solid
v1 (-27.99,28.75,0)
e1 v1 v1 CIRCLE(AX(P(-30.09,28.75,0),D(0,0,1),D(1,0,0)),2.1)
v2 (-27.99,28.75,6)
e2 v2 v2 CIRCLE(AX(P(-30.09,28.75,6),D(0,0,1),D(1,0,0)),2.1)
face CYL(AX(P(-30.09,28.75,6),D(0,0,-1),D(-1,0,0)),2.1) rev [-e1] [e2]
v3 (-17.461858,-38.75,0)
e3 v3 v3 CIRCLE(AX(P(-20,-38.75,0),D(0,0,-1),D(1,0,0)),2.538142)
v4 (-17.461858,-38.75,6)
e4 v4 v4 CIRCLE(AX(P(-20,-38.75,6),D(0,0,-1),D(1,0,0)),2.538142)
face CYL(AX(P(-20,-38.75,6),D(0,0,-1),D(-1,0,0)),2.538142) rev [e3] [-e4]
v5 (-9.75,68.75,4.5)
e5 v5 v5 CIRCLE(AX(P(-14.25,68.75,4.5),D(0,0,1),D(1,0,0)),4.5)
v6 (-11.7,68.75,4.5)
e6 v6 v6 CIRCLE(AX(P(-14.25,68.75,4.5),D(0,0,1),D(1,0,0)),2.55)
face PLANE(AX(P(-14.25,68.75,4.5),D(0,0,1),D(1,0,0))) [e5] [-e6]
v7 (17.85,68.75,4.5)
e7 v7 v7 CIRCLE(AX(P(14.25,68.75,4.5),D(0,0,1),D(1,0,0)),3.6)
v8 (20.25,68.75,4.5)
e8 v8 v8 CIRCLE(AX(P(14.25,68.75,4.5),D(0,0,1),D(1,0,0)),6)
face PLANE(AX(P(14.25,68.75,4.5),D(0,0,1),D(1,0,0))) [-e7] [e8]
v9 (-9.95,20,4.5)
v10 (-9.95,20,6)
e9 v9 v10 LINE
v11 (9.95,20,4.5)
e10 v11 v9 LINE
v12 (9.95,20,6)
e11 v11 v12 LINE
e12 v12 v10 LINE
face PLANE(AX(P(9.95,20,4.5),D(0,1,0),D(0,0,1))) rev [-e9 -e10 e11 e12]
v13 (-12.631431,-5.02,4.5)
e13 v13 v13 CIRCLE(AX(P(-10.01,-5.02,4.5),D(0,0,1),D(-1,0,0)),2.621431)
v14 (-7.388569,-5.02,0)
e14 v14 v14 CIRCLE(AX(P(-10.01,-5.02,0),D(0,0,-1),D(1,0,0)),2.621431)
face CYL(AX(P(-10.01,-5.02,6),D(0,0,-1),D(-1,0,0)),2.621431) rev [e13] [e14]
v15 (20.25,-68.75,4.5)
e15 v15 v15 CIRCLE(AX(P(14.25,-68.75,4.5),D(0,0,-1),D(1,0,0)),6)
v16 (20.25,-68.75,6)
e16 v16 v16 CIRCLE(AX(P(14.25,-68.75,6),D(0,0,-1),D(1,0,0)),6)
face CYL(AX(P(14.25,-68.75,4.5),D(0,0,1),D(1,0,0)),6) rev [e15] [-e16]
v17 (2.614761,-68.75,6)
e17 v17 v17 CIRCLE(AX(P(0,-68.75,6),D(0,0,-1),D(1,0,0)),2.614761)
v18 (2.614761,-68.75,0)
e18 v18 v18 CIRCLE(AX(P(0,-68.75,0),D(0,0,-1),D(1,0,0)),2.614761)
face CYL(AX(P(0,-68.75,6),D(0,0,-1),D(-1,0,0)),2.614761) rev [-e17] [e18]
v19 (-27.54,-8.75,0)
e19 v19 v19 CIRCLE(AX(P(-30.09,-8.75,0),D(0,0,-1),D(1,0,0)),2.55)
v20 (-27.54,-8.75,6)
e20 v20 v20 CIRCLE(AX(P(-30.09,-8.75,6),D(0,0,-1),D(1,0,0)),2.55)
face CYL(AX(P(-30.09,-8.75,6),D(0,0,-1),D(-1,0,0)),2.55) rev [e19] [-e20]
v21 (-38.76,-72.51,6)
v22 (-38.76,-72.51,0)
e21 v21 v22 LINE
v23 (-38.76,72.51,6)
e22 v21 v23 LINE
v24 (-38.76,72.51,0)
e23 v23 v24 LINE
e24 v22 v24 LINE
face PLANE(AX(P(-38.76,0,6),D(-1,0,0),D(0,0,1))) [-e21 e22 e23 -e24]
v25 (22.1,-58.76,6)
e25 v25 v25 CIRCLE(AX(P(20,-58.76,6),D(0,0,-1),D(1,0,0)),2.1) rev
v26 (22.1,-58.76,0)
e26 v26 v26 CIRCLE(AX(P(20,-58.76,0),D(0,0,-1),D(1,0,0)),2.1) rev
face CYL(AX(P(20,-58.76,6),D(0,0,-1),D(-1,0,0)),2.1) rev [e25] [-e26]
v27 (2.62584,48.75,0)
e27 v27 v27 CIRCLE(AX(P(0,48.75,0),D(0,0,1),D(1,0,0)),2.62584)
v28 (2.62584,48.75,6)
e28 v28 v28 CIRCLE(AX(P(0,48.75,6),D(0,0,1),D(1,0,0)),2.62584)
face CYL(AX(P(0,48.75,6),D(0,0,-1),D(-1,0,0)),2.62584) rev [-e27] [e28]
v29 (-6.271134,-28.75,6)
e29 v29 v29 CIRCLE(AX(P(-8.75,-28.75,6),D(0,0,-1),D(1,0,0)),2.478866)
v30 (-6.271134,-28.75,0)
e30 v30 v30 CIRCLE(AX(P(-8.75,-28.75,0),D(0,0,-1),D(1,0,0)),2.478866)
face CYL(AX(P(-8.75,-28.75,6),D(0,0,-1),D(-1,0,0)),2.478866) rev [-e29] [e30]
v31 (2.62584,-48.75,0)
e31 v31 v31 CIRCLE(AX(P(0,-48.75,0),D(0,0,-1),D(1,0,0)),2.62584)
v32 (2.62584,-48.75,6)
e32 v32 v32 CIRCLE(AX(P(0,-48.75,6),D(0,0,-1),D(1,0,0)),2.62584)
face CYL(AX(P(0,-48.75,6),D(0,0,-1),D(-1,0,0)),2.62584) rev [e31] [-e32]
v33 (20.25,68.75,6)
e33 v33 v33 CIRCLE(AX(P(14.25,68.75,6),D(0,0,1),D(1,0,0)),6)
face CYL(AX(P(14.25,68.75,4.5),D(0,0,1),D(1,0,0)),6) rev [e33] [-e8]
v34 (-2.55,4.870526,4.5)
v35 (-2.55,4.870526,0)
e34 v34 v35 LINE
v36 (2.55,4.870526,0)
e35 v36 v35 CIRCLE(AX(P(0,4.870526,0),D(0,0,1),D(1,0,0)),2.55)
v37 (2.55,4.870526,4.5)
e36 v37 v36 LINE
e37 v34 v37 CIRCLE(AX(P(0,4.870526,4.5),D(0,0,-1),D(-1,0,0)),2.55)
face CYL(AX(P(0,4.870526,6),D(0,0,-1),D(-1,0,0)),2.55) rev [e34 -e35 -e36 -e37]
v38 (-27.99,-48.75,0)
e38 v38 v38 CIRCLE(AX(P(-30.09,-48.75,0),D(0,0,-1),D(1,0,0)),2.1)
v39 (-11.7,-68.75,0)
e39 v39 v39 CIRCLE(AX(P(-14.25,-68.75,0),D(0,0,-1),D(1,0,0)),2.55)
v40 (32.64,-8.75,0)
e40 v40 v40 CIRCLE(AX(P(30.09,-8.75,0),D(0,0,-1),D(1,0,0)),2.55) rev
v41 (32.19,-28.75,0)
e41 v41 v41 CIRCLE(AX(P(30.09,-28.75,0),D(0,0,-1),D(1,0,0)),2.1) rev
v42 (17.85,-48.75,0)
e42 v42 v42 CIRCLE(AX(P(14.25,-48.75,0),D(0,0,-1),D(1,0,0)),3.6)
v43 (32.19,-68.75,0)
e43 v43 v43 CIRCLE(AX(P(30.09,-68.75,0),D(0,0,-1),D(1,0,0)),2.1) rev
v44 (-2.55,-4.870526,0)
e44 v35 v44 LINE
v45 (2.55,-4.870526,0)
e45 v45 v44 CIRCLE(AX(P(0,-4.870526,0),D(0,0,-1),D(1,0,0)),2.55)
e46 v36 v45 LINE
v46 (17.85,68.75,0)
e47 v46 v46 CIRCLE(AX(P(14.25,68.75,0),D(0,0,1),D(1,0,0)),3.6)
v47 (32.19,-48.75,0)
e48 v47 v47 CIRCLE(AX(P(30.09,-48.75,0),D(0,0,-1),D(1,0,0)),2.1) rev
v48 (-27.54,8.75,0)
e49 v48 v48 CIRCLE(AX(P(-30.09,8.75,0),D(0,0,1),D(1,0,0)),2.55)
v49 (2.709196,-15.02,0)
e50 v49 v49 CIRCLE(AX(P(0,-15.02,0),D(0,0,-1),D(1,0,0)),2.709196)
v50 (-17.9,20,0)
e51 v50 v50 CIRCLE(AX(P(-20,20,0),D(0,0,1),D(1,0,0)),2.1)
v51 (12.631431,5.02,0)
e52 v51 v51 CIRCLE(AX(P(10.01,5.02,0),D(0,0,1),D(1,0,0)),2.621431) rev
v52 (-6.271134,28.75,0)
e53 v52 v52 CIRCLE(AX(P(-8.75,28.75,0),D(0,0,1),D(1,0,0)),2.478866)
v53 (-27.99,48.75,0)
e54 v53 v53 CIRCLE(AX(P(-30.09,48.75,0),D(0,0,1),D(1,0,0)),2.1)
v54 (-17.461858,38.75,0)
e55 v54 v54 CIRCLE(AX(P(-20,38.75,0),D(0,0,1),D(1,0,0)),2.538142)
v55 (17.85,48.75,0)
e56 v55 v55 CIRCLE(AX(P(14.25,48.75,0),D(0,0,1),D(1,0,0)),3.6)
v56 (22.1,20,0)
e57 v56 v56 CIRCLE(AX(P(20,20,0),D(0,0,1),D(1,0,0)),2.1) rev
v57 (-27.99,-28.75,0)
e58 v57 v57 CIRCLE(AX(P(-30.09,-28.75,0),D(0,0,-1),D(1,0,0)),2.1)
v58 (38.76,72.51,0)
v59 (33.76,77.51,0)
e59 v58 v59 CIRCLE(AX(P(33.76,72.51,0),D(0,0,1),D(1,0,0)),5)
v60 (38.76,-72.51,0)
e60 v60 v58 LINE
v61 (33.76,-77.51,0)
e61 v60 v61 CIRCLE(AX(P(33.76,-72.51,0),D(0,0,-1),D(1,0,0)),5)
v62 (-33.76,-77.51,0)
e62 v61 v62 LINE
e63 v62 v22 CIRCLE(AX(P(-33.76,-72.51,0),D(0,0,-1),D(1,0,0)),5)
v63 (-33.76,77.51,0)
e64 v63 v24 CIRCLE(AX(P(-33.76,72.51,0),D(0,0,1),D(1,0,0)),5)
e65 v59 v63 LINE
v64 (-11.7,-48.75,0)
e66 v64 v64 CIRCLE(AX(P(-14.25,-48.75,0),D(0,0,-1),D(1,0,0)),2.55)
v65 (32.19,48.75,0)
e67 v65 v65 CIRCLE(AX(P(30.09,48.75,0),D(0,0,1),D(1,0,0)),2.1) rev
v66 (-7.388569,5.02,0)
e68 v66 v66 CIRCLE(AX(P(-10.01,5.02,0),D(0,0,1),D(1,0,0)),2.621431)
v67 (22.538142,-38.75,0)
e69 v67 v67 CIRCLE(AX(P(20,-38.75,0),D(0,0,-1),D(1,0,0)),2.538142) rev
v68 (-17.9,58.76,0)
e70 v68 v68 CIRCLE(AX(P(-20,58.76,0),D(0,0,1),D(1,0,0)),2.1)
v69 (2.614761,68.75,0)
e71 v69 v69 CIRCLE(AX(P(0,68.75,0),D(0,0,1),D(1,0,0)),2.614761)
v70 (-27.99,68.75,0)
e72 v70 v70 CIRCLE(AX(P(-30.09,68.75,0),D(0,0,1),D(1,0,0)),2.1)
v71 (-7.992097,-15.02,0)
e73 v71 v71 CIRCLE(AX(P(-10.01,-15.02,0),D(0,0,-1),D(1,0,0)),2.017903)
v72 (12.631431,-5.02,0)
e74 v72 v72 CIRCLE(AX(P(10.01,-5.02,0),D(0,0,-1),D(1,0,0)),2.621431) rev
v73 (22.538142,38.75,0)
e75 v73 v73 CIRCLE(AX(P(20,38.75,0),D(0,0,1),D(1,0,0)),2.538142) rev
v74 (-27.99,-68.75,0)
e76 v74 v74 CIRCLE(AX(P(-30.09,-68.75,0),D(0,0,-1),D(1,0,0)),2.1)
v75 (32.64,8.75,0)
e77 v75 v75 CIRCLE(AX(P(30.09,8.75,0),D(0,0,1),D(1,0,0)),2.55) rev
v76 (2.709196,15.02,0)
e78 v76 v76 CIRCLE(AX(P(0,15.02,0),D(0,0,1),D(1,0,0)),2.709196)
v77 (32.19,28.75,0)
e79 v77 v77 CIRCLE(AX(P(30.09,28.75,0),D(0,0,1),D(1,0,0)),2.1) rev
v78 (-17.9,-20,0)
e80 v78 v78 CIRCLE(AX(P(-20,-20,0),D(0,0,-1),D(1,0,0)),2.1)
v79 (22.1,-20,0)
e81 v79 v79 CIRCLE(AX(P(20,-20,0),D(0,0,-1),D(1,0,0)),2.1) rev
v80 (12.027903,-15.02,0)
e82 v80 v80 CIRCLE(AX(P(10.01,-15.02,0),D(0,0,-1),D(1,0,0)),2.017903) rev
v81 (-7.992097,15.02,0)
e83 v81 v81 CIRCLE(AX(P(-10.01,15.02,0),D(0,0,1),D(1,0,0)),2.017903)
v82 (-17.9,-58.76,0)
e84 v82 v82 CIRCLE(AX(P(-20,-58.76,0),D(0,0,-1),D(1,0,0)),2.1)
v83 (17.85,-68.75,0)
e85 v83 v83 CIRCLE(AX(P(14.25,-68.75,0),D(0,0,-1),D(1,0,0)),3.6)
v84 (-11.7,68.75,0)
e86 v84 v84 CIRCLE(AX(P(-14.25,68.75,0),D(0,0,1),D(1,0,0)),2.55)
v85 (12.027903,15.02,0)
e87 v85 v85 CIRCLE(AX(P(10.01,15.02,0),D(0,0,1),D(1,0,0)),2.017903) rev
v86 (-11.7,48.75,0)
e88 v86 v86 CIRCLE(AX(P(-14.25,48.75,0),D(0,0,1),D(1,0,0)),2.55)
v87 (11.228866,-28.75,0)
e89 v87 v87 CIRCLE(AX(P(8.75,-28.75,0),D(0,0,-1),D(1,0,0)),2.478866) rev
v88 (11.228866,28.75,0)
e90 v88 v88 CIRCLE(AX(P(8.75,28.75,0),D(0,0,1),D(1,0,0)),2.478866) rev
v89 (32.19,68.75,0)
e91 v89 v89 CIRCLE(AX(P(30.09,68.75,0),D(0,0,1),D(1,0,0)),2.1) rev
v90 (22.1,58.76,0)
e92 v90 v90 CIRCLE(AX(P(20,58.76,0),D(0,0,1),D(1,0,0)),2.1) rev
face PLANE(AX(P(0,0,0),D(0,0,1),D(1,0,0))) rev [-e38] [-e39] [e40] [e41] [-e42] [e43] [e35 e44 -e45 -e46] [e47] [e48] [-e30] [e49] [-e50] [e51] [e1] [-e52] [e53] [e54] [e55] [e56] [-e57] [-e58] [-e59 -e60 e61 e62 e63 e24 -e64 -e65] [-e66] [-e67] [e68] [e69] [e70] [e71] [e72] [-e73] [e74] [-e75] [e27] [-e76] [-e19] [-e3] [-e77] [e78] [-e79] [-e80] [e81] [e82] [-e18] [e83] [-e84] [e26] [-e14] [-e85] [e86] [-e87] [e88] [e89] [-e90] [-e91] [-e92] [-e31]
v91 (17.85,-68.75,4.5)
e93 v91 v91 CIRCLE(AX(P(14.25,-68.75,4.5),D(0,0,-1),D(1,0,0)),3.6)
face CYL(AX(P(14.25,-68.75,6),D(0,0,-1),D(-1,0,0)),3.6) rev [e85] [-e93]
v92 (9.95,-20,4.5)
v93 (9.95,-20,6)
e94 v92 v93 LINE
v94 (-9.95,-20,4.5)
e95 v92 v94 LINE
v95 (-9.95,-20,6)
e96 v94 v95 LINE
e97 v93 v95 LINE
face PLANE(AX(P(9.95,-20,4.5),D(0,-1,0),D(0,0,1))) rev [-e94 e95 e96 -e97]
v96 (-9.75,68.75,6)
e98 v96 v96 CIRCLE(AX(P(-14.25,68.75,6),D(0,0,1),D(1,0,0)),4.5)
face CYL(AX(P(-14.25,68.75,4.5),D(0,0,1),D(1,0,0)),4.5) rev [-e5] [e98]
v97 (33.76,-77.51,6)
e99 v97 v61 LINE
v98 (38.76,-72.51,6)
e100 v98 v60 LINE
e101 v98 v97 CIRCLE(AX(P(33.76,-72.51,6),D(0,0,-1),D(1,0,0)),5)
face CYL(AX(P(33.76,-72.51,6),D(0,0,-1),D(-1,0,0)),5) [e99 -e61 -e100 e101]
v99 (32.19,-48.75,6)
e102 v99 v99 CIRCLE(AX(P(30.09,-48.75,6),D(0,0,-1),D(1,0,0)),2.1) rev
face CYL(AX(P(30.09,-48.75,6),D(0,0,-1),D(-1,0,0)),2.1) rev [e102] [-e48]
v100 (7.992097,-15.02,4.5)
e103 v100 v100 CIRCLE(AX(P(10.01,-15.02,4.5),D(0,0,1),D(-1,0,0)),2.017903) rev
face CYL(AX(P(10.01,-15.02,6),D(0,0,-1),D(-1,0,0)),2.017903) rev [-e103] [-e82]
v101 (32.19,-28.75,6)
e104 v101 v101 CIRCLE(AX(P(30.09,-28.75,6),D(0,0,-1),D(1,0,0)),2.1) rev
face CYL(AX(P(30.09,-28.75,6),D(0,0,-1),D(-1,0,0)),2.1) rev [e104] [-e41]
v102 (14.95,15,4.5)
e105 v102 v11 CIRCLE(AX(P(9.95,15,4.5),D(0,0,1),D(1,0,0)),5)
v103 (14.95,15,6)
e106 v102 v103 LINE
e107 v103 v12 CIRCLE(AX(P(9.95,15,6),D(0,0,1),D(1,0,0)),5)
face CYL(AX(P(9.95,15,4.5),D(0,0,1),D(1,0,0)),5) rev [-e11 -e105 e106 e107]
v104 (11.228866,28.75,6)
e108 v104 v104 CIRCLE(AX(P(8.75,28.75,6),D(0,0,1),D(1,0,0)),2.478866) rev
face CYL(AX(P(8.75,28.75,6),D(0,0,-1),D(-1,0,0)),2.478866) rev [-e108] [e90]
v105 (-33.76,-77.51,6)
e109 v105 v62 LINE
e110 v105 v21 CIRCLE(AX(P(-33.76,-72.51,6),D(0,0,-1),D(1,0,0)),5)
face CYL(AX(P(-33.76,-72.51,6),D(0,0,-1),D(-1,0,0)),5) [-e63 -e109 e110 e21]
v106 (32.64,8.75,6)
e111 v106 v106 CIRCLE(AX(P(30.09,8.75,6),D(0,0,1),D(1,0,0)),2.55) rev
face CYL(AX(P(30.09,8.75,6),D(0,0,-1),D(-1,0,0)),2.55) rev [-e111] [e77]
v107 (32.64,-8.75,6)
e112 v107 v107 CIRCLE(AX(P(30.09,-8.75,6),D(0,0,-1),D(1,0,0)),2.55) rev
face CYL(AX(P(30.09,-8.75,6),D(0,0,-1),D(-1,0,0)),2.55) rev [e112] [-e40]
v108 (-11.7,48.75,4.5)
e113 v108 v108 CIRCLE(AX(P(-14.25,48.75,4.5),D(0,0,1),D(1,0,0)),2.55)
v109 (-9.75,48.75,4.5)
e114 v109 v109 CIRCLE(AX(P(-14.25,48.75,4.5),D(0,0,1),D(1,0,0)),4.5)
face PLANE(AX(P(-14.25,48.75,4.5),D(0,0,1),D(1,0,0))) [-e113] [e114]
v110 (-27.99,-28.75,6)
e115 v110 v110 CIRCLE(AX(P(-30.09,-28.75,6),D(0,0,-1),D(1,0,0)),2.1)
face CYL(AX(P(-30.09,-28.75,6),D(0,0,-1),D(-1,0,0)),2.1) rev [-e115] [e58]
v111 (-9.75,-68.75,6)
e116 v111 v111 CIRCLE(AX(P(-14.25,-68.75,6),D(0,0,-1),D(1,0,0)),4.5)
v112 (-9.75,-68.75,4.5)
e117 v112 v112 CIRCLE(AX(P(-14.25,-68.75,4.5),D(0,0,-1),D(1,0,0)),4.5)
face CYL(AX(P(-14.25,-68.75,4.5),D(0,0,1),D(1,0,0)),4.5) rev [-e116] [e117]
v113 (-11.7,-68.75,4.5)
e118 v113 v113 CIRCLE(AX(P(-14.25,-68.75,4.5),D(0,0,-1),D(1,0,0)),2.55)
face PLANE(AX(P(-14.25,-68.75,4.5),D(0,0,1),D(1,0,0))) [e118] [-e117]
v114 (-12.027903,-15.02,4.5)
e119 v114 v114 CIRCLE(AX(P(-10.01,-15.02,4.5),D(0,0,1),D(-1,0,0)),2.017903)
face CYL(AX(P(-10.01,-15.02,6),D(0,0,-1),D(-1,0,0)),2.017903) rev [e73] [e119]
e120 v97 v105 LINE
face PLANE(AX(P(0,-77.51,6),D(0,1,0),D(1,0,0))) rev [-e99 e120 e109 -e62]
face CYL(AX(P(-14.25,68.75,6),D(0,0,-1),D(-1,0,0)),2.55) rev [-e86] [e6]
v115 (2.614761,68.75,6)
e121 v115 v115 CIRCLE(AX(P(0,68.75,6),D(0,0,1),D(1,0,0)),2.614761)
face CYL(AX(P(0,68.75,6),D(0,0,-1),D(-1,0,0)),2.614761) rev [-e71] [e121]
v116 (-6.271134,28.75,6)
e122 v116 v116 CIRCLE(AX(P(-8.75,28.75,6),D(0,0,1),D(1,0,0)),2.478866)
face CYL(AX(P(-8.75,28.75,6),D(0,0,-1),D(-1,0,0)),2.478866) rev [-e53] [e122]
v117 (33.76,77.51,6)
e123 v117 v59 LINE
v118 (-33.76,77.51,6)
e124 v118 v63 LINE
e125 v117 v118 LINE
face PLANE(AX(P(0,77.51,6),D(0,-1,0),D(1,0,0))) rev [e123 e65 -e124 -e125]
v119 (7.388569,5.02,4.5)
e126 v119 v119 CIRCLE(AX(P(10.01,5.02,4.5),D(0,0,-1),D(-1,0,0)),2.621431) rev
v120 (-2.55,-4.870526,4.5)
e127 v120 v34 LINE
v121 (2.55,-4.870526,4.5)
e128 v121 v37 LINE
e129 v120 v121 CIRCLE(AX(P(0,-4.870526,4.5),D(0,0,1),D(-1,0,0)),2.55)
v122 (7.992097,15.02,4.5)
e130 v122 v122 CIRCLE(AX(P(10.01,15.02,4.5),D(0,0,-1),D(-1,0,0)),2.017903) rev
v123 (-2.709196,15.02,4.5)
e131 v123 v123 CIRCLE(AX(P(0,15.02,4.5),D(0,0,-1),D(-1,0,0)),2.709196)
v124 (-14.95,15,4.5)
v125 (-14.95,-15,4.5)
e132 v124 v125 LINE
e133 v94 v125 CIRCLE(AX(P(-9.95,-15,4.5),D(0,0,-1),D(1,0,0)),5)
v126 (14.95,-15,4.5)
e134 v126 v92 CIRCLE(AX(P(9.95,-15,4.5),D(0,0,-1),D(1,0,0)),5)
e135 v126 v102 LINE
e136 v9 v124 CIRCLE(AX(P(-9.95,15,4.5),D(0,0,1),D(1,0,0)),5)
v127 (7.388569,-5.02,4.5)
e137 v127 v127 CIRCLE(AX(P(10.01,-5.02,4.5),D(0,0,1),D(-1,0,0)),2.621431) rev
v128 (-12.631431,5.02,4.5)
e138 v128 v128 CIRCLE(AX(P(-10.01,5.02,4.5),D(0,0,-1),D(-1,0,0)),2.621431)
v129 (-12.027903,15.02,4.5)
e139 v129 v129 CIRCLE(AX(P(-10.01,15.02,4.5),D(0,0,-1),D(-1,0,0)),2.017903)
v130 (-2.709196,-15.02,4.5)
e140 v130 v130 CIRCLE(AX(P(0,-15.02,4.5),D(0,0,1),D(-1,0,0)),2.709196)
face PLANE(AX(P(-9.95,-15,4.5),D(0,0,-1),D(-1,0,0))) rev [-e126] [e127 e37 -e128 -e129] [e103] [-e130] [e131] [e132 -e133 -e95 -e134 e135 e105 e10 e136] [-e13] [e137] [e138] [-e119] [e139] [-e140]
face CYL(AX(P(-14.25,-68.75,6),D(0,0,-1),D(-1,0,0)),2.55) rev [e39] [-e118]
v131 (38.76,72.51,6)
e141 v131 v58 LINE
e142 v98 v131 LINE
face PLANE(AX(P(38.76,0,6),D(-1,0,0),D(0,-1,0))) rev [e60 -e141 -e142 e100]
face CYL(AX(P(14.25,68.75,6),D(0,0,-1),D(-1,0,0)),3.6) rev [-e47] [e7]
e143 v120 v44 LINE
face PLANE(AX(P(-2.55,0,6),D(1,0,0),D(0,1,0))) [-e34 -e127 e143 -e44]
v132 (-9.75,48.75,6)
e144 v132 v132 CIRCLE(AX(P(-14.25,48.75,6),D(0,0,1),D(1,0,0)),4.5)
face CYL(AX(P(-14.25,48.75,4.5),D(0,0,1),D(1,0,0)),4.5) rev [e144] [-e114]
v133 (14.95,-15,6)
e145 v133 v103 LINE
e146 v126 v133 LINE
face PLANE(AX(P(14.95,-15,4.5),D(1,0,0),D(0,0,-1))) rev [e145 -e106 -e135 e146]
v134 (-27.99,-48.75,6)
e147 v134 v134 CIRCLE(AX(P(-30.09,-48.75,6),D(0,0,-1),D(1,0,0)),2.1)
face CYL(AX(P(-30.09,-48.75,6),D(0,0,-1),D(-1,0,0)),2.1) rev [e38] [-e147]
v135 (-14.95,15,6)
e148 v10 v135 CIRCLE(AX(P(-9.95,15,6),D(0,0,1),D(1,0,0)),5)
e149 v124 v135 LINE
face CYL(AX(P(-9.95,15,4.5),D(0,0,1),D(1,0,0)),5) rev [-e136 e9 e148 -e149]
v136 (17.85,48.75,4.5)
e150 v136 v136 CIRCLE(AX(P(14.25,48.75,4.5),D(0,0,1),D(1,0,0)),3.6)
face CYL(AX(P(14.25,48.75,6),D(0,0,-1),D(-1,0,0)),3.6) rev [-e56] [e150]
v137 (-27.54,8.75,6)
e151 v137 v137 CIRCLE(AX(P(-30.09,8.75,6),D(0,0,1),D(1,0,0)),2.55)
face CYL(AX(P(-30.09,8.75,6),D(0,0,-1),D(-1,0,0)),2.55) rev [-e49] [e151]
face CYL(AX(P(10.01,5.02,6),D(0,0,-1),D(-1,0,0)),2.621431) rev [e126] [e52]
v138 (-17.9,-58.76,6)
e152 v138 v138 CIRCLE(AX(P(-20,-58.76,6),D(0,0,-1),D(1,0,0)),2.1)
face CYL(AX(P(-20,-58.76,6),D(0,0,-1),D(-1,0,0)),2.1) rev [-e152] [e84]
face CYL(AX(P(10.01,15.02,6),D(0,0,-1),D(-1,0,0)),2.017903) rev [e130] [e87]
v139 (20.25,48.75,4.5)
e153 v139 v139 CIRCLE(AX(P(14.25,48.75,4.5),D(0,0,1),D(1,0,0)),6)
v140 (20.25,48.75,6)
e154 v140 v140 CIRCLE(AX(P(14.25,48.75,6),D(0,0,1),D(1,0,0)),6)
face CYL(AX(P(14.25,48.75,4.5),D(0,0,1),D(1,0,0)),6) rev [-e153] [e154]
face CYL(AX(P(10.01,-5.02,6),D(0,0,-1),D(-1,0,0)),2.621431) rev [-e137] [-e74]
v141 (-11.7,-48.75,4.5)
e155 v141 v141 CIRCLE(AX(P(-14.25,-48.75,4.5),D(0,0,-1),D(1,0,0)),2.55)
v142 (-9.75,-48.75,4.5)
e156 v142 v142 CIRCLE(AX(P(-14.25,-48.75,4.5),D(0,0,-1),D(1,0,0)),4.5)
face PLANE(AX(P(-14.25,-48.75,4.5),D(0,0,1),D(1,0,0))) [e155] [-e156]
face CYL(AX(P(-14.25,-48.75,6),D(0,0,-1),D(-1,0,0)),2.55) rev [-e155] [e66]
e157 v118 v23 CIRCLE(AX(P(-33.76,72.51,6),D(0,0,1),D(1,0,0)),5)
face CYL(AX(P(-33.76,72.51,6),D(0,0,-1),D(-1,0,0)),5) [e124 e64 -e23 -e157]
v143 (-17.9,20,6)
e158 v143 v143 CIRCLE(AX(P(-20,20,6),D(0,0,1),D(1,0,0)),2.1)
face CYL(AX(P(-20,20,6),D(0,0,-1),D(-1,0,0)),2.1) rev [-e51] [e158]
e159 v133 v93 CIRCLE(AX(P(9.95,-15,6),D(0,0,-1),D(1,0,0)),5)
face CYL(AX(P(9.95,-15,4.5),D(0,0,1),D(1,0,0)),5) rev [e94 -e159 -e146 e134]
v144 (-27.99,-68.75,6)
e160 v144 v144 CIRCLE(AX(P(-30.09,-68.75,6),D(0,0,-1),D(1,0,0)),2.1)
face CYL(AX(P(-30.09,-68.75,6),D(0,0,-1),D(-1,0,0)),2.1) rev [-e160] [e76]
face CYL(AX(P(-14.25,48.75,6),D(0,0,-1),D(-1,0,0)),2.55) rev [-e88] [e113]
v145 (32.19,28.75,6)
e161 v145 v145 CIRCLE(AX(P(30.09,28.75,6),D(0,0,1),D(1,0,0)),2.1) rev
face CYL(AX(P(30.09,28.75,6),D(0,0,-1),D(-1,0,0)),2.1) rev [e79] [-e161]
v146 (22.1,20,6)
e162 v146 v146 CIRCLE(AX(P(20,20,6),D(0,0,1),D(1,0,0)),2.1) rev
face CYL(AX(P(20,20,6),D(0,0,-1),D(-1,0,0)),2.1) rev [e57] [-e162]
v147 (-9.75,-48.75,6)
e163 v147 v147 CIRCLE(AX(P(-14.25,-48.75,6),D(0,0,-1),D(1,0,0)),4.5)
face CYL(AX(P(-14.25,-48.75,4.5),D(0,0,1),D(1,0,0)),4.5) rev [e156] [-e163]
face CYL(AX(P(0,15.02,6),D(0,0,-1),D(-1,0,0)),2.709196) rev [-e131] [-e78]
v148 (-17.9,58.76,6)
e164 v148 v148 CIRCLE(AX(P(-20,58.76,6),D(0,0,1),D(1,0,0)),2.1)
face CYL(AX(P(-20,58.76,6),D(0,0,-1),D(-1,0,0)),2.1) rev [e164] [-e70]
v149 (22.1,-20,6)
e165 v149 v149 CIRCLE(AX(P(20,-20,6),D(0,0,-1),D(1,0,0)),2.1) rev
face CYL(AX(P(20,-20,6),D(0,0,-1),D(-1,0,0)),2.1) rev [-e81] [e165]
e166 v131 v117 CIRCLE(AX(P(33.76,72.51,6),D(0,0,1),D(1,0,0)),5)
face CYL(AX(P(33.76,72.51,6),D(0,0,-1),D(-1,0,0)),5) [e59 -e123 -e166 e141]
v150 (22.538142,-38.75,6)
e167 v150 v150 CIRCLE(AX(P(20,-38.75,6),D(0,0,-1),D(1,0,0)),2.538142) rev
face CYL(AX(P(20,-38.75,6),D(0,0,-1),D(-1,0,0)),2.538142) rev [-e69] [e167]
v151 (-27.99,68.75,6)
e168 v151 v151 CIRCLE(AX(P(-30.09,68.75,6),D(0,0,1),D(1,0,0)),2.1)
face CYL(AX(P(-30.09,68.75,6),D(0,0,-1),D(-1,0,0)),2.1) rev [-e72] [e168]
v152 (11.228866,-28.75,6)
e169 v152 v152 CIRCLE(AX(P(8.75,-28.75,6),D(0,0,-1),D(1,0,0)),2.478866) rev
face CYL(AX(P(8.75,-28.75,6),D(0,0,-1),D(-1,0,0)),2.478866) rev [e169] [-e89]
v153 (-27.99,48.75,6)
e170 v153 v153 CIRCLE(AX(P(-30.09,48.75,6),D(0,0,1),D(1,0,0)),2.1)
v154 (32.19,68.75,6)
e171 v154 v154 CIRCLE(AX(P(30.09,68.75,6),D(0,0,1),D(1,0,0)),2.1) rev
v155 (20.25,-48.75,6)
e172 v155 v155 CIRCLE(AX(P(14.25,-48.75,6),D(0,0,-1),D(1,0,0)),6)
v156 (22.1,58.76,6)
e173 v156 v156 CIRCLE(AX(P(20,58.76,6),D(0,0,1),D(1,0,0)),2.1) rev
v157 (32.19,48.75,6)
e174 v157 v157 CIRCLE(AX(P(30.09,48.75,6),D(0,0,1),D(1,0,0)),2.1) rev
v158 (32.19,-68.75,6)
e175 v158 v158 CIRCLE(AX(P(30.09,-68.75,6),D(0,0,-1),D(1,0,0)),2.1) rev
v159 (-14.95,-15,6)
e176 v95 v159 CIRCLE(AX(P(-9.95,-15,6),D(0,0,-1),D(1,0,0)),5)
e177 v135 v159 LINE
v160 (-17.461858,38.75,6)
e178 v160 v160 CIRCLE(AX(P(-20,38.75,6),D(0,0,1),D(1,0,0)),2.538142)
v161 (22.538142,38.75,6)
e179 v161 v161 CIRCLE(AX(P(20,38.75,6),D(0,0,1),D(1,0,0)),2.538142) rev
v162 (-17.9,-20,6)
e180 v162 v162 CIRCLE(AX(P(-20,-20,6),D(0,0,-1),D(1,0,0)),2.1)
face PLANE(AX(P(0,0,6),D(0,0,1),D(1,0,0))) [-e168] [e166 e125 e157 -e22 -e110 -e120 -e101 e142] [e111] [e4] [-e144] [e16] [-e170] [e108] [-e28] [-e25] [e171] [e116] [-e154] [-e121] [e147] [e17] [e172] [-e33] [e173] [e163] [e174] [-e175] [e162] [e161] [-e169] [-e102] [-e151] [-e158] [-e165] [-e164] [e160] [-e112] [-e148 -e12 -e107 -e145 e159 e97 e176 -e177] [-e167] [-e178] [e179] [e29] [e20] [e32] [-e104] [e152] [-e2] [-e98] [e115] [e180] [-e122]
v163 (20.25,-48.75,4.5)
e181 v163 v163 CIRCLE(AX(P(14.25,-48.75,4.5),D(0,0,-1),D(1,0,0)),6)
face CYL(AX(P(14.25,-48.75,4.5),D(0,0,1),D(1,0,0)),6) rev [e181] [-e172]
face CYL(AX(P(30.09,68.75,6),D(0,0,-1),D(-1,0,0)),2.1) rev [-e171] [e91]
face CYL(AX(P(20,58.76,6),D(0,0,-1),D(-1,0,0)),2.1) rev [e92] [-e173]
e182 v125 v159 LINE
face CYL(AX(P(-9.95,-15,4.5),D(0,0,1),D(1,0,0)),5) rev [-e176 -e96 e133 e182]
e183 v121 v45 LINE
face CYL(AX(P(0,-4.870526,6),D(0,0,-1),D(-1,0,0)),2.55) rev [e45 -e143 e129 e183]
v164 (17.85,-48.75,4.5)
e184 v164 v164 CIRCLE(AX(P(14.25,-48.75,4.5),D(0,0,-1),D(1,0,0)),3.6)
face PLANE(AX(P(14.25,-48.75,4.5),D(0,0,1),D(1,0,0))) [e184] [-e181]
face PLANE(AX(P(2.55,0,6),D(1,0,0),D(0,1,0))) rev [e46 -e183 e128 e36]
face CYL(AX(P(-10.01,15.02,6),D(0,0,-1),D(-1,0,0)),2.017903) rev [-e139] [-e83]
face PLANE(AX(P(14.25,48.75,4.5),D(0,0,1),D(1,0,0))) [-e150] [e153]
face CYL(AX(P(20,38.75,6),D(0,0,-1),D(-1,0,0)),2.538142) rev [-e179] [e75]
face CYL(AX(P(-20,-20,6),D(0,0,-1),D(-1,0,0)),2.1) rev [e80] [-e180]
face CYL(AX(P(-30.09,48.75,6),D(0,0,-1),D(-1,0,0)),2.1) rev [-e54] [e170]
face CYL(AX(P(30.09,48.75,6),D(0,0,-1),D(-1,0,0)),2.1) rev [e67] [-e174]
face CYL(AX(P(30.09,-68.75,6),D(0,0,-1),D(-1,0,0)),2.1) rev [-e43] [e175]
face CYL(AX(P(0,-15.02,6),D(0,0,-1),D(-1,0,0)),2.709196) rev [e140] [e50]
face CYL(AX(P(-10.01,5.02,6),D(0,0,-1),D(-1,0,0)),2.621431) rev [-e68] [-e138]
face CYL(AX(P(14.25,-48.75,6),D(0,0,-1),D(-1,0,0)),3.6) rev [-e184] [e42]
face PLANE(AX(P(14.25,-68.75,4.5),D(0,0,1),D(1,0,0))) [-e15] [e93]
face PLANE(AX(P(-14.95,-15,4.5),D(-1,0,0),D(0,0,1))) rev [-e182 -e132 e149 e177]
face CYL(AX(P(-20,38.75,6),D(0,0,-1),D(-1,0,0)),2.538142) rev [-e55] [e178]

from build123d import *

# Parameters (mm, degrees)
BOSS_EXTRUDE1_OUTLINE_R    = 2.55
BOSS_EXTRUDE1_OUTLINE_R_2  = 2.621431339
BOSS_EXTRUDE1_OUTLINE_R_3  = 2.017902989
BOSS_EXTRUDE1_OUTLINE_R_4  = 2.1
BOSS_EXTRUDE1_OUTLINE_R_5  = 2.538142432
BOSS_EXTRUDE1_OUTLINE_R_6  = 2.478866387
BOSS_EXTRUDE1_OUTLINE_R_7  = 2.709196321
BOSS_EXTRUDE1_OUTLINE_R_8  = 2.625839509
BOSS_EXTRUDE1_OUTLINE_R_9  = 3.6
BOSS_EXTRUDE1_OUTLINE_R_10 = 2.614760952
BOSS_EXTRUDE1_DEPTH        = 6
SKETCH2_R                  = 6
SKETCH2_R_2                = 4.5
CUT_EXTRUDE1_DEPTH         = 1.5


# Read off the part's stored shape, not the designer's step: Boss-Extrude1
with BuildPart() as part:
    # Boss-Extrude1 outline → Boss-Extrude1 (new body)
    with BuildSketch(Plane.XY):
        with BuildLine():
            Line((-2.55, 0), (-2.55, 4.870526086))
            ThreePointArc((-2.55, 4.870526086), (0, 7.420526086), (2.55, 4.870526086))
            Line((2.55, 4.870526086), (2.55, 0))
            Line((2.55, 0), (38.76, 0))
            Line((38.76, 0), (38.76, 72.51))
            ThreePointArc((38.76, 72.51), (37.295533906, 76.045533906), (33.76, 77.51))
            Line((33.76, 77.51), (-33.76, 77.51))
            ThreePointArc((-33.76, 77.51), (-37.295533906, 76.045533906), (-38.76, 72.51))
            Line((-38.76, 72.51), (-38.76, 0))
            Line((-38.76, 0), (-2.55, 0))
        make_face()
        with Locations((-30.09, 8.75)):
            Circle(BOSS_EXTRUDE1_OUTLINE_R, mode=Mode.SUBTRACT)
        with Locations((-10.01, 5.02)):
            Circle(BOSS_EXTRUDE1_OUTLINE_R_2, mode=Mode.SUBTRACT)
        with Locations((-10.01, 15.02)):
            Circle(BOSS_EXTRUDE1_OUTLINE_R_3, mode=Mode.SUBTRACT)
        with Locations((-30.09, 28.75)):
            Circle(BOSS_EXTRUDE1_OUTLINE_R_4, mode=Mode.SUBTRACT)
        with Locations((-20, 20)):
            Circle(BOSS_EXTRUDE1_OUTLINE_R_4, mode=Mode.SUBTRACT)
        with Locations((-20, 38.75)):
            Circle(BOSS_EXTRUDE1_OUTLINE_R_5, mode=Mode.SUBTRACT)
        with Locations((-8.75, 28.75)):
            Circle(BOSS_EXTRUDE1_OUTLINE_R_6, mode=Mode.SUBTRACT)
        with Locations((10.01, 5.02)):
            Circle(BOSS_EXTRUDE1_OUTLINE_R_2, mode=Mode.SUBTRACT)
        with Locations((0, 15.02)):
            Circle(BOSS_EXTRUDE1_OUTLINE_R_7, mode=Mode.SUBTRACT)
        with Locations((10.01, 15.02)):
            Circle(BOSS_EXTRUDE1_OUTLINE_R_3, mode=Mode.SUBTRACT)
        with Locations((30.09, 8.75)):
            Circle(BOSS_EXTRUDE1_OUTLINE_R, mode=Mode.SUBTRACT)
        with Locations((8.75, 28.75)):
            Circle(BOSS_EXTRUDE1_OUTLINE_R_6, mode=Mode.SUBTRACT)
        with Locations((20, 20)):
            Circle(BOSS_EXTRUDE1_OUTLINE_R_4, mode=Mode.SUBTRACT)
        with Locations((30.09, 28.75)):
            Circle(BOSS_EXTRUDE1_OUTLINE_R_4, mode=Mode.SUBTRACT)
        with Locations((20, 38.75)):
            Circle(BOSS_EXTRUDE1_OUTLINE_R_5, mode=Mode.SUBTRACT)
        with Locations((-30.09, 48.75)):
            Circle(BOSS_EXTRUDE1_OUTLINE_R_4, mode=Mode.SUBTRACT)
        with Locations((-14.25, 48.75)):
            Circle(BOSS_EXTRUDE1_OUTLINE_R, mode=Mode.SUBTRACT)
        with Locations((-20, 58.76)):
            Circle(BOSS_EXTRUDE1_OUTLINE_R_4, mode=Mode.SUBTRACT)
        with Locations((-30.09, 68.75)):
            Circle(BOSS_EXTRUDE1_OUTLINE_R_4, mode=Mode.SUBTRACT)
        with Locations((-14.25, 68.75)):
            Circle(BOSS_EXTRUDE1_OUTLINE_R, mode=Mode.SUBTRACT)
        with Locations((0, 48.75)):
            Circle(BOSS_EXTRUDE1_OUTLINE_R_8, mode=Mode.SUBTRACT)
        with Locations((14.25, 48.75)):
            Circle(BOSS_EXTRUDE1_OUTLINE_R_9, mode=Mode.SUBTRACT)
        with Locations((30.09, 48.75)):
            Circle(BOSS_EXTRUDE1_OUTLINE_R_4, mode=Mode.SUBTRACT)
        with Locations((0, 68.75)):
            Circle(BOSS_EXTRUDE1_OUTLINE_R_10, mode=Mode.SUBTRACT)
        with Locations((14.25, 68.75)):
            Circle(BOSS_EXTRUDE1_OUTLINE_R_9, mode=Mode.SUBTRACT)
        with Locations((20, 58.76)):
            Circle(BOSS_EXTRUDE1_OUTLINE_R_4, mode=Mode.SUBTRACT)
        with Locations((30.09, 68.75)):
            Circle(BOSS_EXTRUDE1_OUTLINE_R_4, mode=Mode.SUBTRACT)
    extrude(amount=BOSS_EXTRUDE1_DEPTH)

    # Sketch2 → Cut-Extrude1 (cut)
    with BuildSketch(Plane.XY.offset(6)):
        with Locations((14.25, 68.75)):
            Circle(SKETCH2_R)
        with Locations((14.25, 48.75)):
            Circle(SKETCH2_R)
        with Locations((-14.25, 48.75)):
            Circle(SKETCH2_R_2)
        with Locations((-14.25, 68.75)):
            Circle(SKETCH2_R_2)
        with BuildLine():
            Line((9.95, -20), (-9.95, -20))
            ThreePointArc((-9.95, -20), (-13.485533906, -18.535533906), (-14.95, -15))
            Line((-14.95, -15), (-14.95, 15))
            ThreePointArc((-14.95, 15), (-13.485533906, 18.535533906), (-9.95, 20))
            Line((-9.95, 20), (9.95, 20))
            ThreePointArc((9.95, 20), (13.485533906, 18.535533906), (14.95, 15))
            Line((14.95, 15), (14.95, -15))
            ThreePointArc((14.95, -15), (13.485533906, -18.535533906), (9.95, -20))
        make_face()
    extrude(amount=-CUT_EXTRUDE1_DEPTH, mode=Mode.SUBTRACT)

    # Mirror1: part across plane


with BuildPart() as part_1:
    add(part.part)
    add(part.part.mirror(Plane(origin=(0, 0, 6), x_dir=(0, 0, 1), z_dir=(0, 1, 0))))


solid = part_1.part
